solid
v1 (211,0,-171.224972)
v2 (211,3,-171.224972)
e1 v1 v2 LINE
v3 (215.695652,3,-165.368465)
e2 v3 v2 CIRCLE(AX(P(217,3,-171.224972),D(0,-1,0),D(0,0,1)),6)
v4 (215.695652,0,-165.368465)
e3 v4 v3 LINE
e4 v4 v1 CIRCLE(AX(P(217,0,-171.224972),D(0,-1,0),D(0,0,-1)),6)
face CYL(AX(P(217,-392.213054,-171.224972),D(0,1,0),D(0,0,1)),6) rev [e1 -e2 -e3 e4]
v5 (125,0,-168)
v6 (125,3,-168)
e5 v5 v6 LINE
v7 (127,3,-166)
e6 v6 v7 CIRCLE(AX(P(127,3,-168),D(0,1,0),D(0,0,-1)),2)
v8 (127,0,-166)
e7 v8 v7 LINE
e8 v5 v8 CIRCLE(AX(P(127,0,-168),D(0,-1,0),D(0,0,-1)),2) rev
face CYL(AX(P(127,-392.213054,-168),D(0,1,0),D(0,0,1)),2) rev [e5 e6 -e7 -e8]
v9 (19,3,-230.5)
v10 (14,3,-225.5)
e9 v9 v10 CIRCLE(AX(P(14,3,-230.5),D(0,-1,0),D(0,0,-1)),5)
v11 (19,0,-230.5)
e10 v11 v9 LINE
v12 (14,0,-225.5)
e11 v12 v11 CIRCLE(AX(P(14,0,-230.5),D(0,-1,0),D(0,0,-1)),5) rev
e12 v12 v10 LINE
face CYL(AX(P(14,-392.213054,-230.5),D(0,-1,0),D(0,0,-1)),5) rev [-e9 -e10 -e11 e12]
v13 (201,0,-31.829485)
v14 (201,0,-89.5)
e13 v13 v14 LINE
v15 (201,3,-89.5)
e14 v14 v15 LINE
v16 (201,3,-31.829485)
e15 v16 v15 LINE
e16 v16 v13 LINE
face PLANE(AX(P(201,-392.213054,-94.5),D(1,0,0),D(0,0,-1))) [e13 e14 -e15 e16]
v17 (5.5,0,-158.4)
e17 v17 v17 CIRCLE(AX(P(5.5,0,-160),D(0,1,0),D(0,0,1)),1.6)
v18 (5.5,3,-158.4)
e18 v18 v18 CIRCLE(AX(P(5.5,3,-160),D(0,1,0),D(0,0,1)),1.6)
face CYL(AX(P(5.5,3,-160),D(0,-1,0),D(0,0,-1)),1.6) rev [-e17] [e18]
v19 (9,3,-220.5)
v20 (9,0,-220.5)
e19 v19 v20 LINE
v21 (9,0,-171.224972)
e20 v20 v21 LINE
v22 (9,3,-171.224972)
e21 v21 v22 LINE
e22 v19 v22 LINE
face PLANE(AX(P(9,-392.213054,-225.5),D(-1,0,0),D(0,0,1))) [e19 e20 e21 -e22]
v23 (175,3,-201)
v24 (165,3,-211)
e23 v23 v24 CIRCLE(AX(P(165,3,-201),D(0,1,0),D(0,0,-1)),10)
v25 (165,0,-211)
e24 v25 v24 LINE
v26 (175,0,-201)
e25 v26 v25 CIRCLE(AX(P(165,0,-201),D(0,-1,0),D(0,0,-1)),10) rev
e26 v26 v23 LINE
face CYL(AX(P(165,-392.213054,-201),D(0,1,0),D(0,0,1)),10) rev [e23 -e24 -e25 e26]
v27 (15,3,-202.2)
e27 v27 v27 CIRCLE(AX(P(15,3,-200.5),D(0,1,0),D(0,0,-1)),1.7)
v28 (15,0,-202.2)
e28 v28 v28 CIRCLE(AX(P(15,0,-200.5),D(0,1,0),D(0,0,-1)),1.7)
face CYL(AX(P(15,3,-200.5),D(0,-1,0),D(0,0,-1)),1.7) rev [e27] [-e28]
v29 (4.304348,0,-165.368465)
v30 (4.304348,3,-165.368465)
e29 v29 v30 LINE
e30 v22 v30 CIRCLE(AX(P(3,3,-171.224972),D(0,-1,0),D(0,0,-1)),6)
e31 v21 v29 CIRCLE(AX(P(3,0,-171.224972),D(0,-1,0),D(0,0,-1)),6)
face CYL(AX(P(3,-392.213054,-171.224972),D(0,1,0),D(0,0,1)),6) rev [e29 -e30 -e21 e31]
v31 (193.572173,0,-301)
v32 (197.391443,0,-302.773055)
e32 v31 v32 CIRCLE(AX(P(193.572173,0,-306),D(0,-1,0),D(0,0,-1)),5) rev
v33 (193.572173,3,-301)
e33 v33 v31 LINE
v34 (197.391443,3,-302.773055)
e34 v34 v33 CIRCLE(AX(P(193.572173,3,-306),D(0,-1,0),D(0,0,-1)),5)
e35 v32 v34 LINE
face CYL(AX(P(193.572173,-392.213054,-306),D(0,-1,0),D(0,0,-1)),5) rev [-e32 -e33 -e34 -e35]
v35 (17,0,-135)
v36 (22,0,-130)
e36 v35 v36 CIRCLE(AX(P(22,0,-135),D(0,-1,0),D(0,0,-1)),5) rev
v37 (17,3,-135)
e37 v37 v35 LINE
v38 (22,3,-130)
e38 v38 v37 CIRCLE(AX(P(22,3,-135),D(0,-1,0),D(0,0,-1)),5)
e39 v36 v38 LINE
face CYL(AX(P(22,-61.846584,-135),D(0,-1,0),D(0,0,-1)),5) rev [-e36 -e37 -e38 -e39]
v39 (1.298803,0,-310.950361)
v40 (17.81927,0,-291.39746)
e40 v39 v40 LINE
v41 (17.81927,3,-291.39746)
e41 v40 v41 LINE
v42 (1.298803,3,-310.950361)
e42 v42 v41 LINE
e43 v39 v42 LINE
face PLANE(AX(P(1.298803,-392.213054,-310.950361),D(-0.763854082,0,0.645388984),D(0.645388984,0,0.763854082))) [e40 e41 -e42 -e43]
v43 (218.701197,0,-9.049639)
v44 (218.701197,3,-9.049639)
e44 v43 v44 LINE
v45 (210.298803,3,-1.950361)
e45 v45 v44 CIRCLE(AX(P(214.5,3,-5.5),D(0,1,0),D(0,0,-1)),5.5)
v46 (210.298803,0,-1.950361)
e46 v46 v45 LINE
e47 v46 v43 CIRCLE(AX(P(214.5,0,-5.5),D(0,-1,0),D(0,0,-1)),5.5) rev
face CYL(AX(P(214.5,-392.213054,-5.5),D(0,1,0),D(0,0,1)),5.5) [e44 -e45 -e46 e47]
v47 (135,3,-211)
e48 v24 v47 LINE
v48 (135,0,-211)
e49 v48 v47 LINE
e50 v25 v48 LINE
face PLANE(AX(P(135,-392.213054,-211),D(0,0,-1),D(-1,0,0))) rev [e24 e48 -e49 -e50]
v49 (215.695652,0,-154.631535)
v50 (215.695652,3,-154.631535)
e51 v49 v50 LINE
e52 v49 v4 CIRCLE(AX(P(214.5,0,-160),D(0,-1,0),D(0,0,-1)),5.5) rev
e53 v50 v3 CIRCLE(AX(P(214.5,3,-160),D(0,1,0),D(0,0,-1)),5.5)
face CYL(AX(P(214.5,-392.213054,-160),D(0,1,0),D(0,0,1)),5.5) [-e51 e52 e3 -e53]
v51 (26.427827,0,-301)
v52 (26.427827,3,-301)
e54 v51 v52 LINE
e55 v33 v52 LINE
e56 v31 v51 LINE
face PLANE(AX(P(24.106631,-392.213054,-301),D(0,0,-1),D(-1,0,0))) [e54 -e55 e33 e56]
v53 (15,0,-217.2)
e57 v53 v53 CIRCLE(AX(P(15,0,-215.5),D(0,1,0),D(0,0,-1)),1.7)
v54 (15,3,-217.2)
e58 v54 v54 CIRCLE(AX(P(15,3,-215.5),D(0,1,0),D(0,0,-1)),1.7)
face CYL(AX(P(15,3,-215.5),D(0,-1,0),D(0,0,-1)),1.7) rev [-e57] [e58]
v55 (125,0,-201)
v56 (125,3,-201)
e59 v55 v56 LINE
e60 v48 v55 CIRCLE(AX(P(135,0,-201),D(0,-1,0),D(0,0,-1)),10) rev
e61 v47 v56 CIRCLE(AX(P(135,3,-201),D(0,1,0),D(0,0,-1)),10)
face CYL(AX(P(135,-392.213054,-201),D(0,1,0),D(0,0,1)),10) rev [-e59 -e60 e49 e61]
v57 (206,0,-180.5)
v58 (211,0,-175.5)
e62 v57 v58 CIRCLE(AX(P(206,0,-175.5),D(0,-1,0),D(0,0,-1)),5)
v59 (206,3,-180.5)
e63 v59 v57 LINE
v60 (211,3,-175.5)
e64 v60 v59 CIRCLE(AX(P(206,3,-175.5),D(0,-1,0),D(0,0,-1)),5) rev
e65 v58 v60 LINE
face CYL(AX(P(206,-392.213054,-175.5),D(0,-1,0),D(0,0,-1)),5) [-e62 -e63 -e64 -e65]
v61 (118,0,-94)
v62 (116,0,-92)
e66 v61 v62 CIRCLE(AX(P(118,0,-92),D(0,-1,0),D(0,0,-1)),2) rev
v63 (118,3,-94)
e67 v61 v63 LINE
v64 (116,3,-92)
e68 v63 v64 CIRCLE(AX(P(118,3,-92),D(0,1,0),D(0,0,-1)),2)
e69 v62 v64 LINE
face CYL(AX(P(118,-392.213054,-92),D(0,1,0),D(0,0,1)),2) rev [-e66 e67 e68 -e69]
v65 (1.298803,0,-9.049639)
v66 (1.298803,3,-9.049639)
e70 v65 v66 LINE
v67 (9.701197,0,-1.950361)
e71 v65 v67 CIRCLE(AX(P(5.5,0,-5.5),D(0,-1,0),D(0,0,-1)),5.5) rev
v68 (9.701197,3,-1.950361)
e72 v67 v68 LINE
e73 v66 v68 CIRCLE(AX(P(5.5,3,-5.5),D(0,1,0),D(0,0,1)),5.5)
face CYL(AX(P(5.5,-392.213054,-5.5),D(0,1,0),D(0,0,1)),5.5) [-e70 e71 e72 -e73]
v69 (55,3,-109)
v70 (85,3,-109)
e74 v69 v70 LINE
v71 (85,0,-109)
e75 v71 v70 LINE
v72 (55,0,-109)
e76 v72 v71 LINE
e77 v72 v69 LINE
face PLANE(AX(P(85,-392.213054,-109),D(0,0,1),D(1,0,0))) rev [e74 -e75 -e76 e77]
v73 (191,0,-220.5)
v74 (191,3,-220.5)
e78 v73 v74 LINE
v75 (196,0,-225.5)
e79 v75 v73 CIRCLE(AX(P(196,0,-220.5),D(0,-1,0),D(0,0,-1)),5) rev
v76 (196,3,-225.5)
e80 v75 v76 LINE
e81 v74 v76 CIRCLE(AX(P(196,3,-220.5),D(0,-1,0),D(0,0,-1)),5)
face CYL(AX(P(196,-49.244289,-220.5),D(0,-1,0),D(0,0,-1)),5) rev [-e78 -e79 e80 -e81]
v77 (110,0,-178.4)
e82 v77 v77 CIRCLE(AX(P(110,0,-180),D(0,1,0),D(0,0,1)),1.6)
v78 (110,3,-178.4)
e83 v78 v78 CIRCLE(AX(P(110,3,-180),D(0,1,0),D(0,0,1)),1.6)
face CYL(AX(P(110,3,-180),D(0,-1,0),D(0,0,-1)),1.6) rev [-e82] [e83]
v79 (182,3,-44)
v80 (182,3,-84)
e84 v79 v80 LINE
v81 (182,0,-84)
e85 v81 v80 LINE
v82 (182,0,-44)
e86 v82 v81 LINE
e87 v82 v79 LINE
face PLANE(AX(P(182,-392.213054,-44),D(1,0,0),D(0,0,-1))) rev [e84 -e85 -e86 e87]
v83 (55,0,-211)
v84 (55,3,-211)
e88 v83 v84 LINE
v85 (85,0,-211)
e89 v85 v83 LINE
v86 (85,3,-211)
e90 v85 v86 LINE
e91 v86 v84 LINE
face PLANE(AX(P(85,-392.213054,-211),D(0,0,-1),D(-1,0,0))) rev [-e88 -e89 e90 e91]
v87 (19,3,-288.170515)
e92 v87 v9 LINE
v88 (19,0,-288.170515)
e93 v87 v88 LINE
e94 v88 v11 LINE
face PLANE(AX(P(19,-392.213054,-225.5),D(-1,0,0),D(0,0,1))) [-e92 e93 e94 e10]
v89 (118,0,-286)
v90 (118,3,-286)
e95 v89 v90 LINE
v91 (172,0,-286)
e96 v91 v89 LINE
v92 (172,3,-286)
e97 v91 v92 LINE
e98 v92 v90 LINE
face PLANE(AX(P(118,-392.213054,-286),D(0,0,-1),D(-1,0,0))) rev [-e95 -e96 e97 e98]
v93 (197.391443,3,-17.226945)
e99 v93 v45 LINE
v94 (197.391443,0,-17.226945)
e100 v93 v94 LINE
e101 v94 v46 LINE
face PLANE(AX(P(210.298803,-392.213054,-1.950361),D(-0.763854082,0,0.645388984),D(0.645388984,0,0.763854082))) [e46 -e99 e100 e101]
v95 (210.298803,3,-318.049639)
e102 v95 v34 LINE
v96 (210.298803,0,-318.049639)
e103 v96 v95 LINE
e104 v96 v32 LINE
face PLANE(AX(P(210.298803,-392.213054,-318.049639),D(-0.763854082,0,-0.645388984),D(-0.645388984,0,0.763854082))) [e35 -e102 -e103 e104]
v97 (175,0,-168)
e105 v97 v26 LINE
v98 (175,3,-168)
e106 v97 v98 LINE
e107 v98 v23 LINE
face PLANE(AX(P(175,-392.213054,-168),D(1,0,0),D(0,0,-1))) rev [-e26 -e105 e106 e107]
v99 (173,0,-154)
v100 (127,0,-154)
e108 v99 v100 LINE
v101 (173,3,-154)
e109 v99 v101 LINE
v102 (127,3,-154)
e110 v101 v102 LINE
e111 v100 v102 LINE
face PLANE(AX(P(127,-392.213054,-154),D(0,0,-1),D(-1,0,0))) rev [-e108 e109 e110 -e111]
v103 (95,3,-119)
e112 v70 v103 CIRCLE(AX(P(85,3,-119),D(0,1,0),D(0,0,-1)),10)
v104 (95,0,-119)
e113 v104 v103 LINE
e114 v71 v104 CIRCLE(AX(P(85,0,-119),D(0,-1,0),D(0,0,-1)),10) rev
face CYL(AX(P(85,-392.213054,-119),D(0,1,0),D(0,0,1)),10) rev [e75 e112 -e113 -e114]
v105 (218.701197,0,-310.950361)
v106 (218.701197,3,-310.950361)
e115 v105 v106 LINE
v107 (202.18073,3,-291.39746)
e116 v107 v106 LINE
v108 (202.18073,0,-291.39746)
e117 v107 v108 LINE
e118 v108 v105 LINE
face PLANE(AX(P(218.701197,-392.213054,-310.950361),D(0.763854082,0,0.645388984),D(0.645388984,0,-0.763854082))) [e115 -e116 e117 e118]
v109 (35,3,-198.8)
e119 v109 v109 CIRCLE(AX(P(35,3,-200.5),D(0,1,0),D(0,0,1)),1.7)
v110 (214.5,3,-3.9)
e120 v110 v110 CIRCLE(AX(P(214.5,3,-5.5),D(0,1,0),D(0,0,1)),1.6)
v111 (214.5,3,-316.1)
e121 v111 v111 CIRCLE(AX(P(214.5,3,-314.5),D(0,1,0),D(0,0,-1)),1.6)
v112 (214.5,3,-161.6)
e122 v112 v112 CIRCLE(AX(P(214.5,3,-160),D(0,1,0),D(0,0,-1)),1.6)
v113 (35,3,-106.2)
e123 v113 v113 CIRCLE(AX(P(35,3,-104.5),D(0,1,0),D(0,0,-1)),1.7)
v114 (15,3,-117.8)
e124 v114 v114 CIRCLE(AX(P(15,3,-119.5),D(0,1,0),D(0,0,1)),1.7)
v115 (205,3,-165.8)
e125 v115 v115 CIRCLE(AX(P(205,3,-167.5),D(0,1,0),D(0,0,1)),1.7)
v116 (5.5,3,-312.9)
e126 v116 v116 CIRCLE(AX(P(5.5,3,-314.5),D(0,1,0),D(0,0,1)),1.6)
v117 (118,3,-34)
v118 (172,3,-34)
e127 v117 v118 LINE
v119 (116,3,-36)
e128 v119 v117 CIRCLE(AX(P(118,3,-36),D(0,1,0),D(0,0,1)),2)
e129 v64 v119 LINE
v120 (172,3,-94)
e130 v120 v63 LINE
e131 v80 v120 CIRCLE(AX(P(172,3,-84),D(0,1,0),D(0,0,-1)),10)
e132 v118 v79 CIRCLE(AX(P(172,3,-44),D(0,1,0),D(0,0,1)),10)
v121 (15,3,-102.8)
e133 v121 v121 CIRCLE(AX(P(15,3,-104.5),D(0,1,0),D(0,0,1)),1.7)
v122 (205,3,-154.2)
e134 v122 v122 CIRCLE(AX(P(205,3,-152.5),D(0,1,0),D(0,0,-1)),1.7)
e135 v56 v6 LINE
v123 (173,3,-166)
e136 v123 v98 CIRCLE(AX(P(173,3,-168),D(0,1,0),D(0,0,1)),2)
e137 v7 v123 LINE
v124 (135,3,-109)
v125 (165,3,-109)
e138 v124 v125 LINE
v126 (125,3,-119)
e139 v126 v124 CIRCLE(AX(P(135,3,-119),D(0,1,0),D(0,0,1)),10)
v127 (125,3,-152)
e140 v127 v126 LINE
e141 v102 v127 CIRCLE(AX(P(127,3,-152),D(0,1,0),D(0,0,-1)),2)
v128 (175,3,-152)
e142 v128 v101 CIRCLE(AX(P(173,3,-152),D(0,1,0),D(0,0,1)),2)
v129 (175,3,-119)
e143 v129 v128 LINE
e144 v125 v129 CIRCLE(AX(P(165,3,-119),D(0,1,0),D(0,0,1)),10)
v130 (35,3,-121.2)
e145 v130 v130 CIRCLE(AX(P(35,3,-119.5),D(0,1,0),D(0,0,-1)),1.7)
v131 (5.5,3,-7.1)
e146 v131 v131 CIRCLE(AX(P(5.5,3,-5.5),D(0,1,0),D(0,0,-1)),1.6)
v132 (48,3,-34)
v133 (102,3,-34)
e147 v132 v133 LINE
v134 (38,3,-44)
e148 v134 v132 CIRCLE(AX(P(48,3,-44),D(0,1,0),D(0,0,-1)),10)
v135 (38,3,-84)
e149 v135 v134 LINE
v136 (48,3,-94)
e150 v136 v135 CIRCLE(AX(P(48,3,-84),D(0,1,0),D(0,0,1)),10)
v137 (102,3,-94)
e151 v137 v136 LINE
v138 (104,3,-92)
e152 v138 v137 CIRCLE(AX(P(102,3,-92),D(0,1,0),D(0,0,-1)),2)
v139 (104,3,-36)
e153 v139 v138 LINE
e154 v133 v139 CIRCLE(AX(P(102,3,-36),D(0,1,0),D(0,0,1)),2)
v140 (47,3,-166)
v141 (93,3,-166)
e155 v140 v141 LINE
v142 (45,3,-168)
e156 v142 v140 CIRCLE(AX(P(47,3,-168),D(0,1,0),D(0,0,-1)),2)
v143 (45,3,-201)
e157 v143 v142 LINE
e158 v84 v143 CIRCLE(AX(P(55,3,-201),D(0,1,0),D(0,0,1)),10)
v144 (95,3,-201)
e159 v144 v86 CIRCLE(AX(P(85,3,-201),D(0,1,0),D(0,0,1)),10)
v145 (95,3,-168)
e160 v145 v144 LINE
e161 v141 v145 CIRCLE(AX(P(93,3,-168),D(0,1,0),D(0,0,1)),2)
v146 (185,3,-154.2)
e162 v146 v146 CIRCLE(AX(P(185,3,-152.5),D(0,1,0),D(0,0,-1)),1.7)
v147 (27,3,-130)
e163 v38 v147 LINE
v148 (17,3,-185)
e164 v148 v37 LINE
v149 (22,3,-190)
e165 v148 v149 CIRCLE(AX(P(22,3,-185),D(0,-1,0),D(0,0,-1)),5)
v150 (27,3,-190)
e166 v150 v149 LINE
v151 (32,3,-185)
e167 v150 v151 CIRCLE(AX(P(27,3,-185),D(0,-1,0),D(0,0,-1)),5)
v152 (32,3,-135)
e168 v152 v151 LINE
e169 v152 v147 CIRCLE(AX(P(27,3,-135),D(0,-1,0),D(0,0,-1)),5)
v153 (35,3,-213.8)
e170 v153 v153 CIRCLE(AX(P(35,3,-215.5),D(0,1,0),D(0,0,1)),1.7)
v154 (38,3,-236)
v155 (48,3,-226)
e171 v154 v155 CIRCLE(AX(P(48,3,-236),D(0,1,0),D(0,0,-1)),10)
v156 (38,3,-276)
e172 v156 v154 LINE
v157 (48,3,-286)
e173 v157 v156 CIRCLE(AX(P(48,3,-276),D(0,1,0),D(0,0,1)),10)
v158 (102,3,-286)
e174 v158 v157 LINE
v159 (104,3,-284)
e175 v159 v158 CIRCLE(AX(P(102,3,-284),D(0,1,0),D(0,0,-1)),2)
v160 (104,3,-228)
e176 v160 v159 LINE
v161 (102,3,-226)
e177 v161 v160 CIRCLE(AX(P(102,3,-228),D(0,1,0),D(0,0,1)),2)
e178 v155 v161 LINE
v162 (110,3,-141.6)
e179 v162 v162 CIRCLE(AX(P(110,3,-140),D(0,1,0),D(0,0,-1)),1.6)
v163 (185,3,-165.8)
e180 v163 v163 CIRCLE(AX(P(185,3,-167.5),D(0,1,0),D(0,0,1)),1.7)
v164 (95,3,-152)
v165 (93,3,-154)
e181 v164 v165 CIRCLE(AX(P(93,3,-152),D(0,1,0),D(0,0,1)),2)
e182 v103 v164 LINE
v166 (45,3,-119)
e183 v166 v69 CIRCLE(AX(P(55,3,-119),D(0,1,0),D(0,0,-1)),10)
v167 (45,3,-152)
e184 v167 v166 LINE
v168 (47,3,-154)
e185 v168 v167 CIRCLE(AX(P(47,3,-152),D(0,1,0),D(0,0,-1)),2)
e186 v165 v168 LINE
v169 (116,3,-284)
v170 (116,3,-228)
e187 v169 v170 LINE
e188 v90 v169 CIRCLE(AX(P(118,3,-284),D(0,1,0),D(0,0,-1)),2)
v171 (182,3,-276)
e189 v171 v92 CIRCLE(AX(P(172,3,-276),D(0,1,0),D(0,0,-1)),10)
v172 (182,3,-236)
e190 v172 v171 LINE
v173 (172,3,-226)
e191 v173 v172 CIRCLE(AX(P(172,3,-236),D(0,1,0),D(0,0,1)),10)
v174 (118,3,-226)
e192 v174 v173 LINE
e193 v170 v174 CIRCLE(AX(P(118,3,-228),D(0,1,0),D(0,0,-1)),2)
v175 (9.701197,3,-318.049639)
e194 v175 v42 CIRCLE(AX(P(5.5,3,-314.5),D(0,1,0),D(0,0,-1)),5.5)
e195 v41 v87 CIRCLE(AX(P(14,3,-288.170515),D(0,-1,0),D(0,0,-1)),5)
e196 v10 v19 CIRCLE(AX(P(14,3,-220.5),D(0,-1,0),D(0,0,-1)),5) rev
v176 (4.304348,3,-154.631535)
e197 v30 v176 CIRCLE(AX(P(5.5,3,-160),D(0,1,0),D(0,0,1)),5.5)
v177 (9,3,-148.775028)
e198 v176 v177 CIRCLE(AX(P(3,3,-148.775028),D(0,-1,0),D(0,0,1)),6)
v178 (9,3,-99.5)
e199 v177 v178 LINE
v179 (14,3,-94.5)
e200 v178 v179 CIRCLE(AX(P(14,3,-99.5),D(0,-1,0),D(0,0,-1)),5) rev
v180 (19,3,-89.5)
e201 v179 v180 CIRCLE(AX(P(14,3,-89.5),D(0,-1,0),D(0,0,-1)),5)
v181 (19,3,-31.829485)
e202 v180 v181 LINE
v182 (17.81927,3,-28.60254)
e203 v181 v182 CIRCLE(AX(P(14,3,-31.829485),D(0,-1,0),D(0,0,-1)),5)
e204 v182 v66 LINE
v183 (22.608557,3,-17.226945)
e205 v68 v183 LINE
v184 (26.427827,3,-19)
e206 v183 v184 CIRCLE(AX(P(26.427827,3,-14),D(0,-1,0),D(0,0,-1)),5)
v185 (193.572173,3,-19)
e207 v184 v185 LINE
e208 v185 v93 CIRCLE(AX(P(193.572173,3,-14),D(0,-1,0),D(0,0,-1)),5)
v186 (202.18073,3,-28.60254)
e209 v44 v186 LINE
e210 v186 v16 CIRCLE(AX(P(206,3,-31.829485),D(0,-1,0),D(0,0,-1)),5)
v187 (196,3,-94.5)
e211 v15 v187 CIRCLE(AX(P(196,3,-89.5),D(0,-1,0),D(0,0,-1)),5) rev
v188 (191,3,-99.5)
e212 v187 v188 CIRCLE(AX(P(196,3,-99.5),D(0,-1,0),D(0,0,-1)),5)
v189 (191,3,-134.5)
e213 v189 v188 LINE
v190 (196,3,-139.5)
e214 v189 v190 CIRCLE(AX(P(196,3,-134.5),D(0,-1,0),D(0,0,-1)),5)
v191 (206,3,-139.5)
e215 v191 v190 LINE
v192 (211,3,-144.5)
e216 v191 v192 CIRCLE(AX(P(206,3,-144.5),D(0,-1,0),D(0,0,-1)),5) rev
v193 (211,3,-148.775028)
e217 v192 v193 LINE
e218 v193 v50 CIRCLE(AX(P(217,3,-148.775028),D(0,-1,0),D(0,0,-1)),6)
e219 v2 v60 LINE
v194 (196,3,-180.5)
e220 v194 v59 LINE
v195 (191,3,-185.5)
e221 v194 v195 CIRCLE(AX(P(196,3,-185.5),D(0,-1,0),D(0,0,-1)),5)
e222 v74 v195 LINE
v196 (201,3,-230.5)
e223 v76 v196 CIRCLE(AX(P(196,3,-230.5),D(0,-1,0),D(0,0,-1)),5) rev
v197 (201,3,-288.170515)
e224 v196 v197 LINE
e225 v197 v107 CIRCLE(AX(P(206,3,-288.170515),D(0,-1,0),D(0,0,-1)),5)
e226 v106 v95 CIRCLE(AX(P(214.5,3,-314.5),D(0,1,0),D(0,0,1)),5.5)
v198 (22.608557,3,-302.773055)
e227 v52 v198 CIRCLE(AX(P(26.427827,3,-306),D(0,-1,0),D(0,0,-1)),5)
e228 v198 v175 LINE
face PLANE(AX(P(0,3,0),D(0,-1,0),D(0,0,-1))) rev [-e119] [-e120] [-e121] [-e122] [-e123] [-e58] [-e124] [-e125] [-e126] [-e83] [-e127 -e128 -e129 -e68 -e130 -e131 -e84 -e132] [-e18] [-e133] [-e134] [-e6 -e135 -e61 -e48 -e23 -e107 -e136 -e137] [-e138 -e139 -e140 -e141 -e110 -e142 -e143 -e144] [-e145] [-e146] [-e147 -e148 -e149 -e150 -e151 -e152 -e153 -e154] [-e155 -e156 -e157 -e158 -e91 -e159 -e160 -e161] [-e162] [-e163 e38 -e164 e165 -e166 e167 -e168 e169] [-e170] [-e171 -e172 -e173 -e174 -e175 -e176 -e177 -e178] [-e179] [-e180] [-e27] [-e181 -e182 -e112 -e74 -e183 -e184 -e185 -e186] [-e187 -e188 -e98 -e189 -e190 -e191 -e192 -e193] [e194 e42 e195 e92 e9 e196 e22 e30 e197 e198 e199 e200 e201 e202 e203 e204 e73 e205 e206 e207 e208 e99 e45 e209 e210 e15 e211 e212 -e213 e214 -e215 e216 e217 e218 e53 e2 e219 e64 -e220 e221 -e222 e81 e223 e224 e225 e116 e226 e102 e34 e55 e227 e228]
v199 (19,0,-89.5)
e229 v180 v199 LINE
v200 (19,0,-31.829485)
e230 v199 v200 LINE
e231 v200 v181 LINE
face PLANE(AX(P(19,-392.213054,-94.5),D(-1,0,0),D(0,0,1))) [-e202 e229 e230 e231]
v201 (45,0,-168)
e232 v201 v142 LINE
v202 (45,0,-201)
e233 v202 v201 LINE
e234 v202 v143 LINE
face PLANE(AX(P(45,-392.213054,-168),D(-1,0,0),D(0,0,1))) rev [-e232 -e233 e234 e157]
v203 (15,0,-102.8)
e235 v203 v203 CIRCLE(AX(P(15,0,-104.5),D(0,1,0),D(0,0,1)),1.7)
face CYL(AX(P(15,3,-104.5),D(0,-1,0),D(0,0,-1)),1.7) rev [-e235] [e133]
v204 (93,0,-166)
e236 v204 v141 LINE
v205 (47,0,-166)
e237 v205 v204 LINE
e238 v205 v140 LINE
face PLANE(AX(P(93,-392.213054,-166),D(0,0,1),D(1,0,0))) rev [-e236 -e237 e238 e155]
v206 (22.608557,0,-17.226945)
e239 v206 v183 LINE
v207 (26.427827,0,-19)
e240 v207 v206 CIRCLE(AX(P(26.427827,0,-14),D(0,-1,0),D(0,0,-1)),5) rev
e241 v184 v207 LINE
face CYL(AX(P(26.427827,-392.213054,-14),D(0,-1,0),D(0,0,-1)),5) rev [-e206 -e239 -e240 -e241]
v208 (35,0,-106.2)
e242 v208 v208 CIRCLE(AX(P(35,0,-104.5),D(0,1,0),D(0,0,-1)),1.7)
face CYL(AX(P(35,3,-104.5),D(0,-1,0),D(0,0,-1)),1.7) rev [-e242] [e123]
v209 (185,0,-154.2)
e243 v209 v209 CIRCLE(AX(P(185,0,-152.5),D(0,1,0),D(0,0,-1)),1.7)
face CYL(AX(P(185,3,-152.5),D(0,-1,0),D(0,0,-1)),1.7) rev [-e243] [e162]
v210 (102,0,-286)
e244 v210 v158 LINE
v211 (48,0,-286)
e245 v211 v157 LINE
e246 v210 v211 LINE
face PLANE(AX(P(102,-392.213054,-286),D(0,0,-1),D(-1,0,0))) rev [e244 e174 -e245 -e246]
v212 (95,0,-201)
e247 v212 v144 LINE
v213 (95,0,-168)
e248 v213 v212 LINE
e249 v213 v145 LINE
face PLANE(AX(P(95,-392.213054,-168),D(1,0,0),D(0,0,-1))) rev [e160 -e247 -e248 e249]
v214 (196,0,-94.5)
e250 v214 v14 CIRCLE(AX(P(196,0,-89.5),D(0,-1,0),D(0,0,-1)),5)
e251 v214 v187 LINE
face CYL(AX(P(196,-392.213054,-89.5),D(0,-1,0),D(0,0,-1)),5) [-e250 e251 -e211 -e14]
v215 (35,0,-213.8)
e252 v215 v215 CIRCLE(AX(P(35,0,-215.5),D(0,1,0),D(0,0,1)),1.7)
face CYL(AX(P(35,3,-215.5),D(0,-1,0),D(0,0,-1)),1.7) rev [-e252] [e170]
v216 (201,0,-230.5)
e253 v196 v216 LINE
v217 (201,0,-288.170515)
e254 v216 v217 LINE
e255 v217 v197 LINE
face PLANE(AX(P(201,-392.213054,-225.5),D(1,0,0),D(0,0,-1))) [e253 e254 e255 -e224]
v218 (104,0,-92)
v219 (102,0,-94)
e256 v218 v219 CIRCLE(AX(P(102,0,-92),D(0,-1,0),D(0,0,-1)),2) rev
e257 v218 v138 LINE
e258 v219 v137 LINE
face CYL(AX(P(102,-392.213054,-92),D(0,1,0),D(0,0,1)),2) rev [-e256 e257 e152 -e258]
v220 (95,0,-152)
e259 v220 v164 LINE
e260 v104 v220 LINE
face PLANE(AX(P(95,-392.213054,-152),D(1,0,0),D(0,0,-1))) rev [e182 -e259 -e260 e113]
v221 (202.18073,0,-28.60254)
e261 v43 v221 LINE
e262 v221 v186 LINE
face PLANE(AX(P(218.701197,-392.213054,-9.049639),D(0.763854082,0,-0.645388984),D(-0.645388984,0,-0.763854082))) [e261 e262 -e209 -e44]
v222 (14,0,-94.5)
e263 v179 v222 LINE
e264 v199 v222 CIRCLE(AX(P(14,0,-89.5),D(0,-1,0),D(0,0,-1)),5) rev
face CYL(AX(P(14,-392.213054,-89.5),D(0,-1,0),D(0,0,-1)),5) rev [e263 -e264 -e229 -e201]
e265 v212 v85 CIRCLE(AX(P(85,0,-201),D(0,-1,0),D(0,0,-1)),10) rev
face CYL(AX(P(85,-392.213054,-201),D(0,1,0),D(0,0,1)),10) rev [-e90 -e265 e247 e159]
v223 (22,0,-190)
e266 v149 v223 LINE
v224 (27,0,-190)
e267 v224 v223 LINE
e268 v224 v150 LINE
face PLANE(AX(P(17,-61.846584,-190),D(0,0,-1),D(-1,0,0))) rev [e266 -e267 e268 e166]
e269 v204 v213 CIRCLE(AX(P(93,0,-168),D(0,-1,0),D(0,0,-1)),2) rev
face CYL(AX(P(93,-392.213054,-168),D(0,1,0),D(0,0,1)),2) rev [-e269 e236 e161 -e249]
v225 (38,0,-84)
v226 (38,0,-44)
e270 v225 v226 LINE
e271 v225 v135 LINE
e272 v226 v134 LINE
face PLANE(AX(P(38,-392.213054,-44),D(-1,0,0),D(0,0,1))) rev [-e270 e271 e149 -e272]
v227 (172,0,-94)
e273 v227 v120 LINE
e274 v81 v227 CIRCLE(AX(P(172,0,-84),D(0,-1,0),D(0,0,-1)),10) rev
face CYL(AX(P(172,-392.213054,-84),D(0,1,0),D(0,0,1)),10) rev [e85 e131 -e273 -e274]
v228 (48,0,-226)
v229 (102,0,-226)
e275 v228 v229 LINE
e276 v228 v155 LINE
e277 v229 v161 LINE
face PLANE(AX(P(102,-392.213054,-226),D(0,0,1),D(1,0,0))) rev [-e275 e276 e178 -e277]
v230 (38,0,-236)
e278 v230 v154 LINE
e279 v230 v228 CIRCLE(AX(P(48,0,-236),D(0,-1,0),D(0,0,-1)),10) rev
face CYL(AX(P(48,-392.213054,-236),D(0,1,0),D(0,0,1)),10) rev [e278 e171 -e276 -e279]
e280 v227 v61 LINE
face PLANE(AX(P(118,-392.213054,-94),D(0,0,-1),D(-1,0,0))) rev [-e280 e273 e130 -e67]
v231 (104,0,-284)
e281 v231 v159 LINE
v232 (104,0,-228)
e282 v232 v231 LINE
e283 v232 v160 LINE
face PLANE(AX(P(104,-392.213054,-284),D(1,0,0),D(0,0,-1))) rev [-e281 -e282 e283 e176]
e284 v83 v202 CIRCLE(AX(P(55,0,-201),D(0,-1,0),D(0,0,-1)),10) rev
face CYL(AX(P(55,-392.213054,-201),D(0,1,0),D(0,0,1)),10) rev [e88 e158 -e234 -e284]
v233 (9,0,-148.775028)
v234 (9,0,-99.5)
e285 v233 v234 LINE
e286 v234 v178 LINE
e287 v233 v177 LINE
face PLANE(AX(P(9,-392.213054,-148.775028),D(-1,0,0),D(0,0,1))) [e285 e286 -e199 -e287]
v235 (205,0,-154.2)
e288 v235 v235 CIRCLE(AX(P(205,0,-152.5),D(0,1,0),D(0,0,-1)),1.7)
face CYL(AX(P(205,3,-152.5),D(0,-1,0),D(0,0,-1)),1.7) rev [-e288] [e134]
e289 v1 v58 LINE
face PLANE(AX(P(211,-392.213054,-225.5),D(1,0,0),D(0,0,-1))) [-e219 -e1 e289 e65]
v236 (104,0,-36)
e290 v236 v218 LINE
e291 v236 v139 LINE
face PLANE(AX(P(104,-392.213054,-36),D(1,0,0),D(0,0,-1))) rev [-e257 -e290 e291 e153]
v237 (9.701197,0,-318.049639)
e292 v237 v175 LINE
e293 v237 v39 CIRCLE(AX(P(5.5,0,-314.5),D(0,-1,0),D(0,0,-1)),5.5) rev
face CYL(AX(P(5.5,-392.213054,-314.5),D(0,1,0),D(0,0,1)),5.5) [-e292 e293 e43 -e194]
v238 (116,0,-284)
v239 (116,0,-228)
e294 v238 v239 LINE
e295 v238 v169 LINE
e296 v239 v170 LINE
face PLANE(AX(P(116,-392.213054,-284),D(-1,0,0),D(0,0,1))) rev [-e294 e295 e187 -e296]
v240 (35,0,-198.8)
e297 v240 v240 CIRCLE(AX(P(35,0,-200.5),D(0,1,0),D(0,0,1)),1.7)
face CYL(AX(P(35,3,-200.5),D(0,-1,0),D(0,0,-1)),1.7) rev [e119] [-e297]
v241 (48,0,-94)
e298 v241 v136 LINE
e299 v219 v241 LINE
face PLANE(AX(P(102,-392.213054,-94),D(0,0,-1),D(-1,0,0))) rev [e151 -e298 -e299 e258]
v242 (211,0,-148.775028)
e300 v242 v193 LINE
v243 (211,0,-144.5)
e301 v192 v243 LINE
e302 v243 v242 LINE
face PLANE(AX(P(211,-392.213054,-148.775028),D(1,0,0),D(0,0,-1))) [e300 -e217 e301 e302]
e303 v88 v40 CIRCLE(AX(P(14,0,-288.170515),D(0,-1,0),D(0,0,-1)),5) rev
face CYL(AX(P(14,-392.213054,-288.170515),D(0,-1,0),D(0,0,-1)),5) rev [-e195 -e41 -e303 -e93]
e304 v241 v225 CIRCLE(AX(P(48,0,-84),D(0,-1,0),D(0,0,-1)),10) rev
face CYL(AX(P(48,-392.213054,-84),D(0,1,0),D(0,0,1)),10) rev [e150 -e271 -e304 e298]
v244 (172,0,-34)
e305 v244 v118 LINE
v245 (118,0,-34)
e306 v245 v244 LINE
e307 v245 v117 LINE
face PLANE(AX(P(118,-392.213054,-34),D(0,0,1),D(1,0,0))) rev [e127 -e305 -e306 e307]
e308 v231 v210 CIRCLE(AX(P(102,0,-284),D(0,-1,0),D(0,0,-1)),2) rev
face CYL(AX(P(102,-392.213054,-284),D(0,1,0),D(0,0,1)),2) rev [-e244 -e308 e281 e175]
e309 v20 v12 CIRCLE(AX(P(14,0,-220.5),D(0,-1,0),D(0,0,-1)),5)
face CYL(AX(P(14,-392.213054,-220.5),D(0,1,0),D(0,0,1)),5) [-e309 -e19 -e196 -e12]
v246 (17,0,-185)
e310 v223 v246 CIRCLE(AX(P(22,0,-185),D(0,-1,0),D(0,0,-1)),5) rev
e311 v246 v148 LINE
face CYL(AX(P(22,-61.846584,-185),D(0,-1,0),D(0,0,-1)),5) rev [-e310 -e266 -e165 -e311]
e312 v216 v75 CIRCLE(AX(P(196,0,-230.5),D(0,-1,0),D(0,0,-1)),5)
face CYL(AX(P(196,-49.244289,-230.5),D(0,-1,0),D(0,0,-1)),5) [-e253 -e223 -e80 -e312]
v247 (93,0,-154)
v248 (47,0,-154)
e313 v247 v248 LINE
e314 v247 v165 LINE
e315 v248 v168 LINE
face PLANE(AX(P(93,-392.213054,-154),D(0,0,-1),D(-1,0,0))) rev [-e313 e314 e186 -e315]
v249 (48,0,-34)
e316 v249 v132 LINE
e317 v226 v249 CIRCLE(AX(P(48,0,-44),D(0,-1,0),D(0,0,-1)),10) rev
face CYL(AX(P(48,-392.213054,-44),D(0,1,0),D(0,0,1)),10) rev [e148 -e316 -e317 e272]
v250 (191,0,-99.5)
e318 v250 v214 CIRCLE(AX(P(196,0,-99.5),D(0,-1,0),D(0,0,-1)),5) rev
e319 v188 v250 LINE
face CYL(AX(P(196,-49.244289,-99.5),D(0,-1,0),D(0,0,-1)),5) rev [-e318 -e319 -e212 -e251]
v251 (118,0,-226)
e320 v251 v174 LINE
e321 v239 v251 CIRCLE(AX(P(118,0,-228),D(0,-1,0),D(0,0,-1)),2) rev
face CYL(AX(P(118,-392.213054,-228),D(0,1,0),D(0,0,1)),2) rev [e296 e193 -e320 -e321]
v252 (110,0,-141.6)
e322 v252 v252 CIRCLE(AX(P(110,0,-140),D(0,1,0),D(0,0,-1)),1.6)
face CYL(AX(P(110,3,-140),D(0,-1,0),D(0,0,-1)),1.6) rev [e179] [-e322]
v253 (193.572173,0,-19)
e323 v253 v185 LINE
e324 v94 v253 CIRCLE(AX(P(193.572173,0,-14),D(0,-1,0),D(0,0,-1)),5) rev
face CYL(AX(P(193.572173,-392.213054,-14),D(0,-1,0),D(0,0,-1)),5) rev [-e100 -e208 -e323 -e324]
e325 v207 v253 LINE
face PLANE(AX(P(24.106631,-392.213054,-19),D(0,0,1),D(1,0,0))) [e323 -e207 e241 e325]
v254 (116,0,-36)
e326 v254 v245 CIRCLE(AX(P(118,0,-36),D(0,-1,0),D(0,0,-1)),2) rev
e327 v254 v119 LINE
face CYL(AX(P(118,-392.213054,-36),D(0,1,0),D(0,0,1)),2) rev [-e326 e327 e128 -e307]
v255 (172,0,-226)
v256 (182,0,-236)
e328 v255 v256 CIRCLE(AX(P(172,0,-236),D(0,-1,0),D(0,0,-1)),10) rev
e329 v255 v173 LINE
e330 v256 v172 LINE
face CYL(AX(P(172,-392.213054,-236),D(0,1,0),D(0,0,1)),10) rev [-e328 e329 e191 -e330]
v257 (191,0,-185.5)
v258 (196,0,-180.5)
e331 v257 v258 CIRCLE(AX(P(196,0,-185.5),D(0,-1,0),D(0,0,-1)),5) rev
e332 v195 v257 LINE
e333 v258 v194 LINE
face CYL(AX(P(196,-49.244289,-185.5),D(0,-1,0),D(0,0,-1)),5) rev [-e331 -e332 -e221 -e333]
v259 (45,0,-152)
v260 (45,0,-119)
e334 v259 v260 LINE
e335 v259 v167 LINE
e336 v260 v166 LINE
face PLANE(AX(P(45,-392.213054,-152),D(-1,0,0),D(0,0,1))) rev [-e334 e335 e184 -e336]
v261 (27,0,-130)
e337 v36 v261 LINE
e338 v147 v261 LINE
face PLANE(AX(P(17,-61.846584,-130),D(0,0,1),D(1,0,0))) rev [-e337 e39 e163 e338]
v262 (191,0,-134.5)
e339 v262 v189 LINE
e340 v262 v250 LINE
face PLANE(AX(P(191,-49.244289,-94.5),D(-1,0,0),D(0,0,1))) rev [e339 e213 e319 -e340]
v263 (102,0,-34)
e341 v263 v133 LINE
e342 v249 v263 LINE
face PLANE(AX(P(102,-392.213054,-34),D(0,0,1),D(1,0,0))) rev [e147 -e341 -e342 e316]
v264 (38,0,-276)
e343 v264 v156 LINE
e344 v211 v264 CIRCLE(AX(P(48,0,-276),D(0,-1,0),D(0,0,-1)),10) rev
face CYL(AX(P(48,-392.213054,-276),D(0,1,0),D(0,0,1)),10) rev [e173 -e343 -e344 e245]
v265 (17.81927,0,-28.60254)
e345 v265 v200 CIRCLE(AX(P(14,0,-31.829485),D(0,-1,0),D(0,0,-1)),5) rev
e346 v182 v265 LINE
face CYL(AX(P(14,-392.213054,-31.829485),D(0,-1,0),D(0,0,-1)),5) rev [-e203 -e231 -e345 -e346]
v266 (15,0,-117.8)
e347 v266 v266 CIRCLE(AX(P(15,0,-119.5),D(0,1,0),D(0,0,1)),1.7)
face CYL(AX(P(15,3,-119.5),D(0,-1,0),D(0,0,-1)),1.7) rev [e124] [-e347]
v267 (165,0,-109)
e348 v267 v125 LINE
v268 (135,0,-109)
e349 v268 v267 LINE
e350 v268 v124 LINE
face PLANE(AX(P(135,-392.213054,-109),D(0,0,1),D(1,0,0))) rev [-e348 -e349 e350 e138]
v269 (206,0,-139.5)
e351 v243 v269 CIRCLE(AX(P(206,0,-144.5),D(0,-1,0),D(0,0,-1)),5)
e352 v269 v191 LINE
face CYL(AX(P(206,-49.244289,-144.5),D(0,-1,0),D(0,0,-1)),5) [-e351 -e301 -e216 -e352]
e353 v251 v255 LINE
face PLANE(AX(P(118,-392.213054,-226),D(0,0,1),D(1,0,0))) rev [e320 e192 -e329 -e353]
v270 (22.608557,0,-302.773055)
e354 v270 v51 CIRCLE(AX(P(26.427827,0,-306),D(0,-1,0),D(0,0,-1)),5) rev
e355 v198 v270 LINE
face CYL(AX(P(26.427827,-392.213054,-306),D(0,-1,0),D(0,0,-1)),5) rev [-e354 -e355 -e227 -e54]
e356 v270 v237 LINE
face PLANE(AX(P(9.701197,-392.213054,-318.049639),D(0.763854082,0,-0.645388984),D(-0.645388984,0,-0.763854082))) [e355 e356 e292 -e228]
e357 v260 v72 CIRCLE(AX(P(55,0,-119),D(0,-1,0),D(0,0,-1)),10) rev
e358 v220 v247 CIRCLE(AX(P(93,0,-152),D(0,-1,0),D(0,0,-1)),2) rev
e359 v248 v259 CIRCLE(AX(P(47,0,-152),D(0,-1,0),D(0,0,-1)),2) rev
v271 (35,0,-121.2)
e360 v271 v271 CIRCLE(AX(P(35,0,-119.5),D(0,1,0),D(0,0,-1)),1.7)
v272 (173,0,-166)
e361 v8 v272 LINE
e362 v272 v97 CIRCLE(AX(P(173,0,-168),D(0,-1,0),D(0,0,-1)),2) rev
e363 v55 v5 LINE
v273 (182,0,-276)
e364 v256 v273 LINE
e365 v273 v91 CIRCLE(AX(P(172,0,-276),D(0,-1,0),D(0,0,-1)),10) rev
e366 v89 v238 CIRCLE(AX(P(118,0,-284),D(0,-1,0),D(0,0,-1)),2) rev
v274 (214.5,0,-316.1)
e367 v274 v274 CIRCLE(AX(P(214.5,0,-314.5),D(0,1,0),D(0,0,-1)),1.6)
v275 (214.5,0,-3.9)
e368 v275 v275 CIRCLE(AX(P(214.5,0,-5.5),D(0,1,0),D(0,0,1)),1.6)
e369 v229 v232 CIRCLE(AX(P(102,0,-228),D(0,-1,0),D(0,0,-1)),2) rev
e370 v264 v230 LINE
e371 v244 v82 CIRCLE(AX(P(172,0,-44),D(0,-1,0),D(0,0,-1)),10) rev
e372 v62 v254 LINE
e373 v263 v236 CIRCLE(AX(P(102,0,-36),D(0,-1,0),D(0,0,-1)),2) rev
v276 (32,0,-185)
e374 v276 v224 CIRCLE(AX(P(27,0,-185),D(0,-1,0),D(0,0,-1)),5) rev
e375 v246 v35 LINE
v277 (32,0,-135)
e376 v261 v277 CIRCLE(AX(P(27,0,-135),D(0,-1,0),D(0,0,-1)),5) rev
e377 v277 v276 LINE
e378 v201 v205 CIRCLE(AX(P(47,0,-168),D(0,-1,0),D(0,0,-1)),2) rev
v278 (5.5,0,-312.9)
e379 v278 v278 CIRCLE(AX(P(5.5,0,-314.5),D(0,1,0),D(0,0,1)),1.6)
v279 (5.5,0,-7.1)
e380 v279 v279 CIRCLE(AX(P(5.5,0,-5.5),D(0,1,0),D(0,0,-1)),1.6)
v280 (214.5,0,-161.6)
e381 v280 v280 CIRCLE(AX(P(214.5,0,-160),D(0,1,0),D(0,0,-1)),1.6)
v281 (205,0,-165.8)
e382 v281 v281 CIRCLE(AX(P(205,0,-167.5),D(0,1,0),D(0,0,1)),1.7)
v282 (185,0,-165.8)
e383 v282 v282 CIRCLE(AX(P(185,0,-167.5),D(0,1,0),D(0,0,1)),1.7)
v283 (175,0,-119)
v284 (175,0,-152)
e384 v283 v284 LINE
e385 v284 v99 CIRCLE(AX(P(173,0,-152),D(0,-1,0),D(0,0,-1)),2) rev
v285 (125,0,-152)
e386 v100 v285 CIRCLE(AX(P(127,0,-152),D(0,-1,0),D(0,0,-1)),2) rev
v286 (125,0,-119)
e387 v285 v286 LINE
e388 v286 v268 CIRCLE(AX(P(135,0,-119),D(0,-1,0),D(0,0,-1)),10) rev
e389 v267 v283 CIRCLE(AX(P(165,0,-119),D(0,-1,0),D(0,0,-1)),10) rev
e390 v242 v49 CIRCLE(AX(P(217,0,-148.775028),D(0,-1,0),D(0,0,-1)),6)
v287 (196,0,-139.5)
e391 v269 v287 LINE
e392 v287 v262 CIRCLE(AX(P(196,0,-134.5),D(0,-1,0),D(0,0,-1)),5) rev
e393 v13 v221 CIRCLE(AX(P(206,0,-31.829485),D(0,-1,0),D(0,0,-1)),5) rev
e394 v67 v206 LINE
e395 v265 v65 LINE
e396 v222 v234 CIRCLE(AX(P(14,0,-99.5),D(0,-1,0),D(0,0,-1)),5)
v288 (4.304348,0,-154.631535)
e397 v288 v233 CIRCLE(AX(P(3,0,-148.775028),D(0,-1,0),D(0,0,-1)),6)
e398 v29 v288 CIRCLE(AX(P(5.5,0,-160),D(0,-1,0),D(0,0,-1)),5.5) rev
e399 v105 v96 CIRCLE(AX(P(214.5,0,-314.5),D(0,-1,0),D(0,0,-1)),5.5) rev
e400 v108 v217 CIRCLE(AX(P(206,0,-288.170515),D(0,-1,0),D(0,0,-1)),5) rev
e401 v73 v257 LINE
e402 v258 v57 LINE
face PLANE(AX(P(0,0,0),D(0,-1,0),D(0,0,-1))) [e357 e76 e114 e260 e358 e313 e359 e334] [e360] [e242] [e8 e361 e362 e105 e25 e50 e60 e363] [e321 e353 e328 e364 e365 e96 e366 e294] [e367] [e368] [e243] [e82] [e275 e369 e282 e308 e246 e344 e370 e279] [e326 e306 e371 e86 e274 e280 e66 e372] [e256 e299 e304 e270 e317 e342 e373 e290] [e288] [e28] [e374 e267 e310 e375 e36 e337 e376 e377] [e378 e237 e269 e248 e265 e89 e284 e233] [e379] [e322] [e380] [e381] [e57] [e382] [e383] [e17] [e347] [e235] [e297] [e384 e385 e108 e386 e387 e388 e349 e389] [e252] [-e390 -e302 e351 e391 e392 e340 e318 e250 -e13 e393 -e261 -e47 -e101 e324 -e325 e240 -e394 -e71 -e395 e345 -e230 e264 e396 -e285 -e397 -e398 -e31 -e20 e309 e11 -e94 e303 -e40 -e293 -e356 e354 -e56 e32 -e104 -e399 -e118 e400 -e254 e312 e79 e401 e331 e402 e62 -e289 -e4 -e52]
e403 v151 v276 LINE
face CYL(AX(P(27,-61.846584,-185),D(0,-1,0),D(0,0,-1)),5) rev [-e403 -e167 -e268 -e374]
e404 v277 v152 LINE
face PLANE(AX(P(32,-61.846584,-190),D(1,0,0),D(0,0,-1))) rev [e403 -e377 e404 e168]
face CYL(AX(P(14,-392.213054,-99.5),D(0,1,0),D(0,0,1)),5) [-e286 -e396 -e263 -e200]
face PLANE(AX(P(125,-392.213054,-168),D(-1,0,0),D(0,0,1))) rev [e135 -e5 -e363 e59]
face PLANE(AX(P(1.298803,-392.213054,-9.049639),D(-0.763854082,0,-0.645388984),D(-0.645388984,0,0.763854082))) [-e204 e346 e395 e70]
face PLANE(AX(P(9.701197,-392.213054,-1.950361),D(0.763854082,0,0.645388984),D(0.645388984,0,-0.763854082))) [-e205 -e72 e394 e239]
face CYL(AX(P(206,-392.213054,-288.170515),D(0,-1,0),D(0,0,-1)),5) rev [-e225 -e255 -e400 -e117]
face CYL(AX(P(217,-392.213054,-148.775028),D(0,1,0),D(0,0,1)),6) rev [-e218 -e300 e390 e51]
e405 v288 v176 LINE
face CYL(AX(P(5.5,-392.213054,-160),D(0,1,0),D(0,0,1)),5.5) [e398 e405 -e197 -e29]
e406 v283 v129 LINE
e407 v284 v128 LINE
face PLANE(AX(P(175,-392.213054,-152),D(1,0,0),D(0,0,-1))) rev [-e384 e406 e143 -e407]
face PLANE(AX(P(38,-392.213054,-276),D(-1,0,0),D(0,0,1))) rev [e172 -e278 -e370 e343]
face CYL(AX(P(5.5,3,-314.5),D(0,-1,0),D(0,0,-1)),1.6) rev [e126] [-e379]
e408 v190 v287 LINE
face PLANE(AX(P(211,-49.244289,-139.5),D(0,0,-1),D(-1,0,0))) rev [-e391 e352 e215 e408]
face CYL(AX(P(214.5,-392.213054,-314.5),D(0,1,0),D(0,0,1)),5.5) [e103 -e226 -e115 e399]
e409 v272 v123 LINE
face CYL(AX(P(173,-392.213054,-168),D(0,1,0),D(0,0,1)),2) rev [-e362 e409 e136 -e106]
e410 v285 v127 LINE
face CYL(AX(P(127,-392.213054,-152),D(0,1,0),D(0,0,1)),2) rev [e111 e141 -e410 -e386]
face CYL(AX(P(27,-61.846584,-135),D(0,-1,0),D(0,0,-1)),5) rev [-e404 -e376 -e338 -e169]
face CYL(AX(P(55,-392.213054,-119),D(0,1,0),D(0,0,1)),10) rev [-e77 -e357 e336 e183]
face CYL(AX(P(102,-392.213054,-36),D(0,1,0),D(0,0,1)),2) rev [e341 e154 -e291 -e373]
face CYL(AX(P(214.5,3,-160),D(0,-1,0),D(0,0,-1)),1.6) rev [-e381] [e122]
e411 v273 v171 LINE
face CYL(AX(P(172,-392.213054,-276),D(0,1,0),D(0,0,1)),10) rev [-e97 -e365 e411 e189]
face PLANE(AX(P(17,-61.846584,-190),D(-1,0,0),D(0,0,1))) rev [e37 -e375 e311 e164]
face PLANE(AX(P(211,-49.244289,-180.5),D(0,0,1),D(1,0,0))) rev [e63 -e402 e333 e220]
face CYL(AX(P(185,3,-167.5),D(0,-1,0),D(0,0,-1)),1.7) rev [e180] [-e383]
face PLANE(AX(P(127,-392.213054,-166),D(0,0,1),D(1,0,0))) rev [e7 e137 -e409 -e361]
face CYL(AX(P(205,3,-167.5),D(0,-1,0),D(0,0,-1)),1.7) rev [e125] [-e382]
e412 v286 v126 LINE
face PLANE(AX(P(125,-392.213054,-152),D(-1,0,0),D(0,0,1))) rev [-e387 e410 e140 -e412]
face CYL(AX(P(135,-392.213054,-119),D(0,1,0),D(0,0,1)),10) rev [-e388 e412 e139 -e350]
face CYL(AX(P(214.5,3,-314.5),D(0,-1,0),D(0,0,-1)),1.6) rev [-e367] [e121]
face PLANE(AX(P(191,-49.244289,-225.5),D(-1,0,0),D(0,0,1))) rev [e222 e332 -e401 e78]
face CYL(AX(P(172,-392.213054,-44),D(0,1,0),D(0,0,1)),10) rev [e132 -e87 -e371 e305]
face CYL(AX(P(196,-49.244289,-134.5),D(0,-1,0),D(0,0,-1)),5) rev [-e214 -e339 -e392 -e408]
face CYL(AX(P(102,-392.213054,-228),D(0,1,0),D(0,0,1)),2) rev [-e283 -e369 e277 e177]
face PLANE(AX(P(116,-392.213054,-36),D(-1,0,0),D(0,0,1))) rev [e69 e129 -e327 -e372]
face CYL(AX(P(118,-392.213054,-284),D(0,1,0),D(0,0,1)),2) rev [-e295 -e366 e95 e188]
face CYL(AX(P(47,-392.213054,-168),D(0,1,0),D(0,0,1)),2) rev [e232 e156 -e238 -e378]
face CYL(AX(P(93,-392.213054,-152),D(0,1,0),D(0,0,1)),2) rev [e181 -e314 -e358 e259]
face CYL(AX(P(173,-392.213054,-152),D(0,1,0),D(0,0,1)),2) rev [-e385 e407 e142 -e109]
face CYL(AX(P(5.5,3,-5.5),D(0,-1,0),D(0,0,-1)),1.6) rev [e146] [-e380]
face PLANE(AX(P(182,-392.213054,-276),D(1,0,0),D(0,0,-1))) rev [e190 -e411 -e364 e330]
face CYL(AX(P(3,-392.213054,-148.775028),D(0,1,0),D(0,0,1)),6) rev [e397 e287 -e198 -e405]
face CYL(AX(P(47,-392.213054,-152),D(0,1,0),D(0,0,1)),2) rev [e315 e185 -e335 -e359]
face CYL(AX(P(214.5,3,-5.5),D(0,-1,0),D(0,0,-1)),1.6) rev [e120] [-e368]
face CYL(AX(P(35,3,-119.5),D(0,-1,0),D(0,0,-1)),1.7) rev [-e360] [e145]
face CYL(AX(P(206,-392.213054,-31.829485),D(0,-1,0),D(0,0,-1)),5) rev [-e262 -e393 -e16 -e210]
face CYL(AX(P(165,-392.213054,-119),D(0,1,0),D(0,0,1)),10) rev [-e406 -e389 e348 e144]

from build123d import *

# Parameters (mm, degrees)
CROQUIS1_W              = 220
CROQUIS1_H              = 320
CROQUIS1_R              = 1.7
CROQUIS1_R_2            = 1.6
SALIENTE_EXTRUIR1_DEPTH = 3
CROQUIS2_OUTSIDE_W      = 299.668
CROQUIS2_OUTSIDE_H      = 399.668
CORTAR_EXTRUIR1_DEPTH   = 3
REDONDEO1_R             = 5
CROQUIS3_W              = 20
CROQUIS3_H              = 45
CORTAR_EXTRUIR2_DEPTH   = 3
CROQUIS4_W              = 15
CROQUIS4_H              = 60
CORTAR_EXTRUIR3_DEPTH   = 3
REDONDEO2_R             = 5


with BuildPart() as part:
    # Croquis1 → Saliente-Extruir1 (new body)
    with BuildSketch(Plane(origin=(0, 0, 0), x_dir=(1, 0, 0), z_dir=(0, 1, 0))):
        with Locations((110, 160)):
            Rectangle(CROQUIS1_W, CROQUIS1_H)
        with Locations(Location((185, 167.5, 0), (0, 0, 270))):
            Circle(CROQUIS1_R, mode=Mode.SUBTRACT)
        with Locations(Location((205, 167.5, 0), (0, 0, 270))):
            Circle(CROQUIS1_R, mode=Mode.SUBTRACT)
        with Locations(Location((185, 152.5, 0), (0, 0, 90))):
            Circle(CROQUIS1_R, mode=Mode.SUBTRACT)
        with Locations(Location((205, 152.5, 0), (0, 0, 90))):
            Circle(CROQUIS1_R, mode=Mode.SUBTRACT)
        with Locations(Location((35, 215.5, 0), (0, 0, 270))):
            Circle(CROQUIS1_R, mode=Mode.SUBTRACT)
        with Locations(Location((35, 200.5, 0), (0, 0, 270))):
            Circle(CROQUIS1_R, mode=Mode.SUBTRACT)
        with Locations(Location((35, 119.5, 0), (0, 0, 90))):
            Circle(CROQUIS1_R, mode=Mode.SUBTRACT)
        with Locations(Location((35, 104.5, 0), (0, 0, 90))):
            Circle(CROQUIS1_R, mode=Mode.SUBTRACT)
        with Locations(Location((5.5, 314.5, 0), (0, 0, 270))):
            Circle(CROQUIS1_R_2, mode=Mode.SUBTRACT)
        with Locations(Location((214.5, 314.5, 0), (0, 0, 90))):
            Circle(CROQUIS1_R_2, mode=Mode.SUBTRACT)
        with Locations(Location((214.5, 5.5, 0), (0, 0, 270))):
            Circle(CROQUIS1_R_2, mode=Mode.SUBTRACT)
        with Locations(Location((5.5, 5.5, 0), (0, 0, 90))):
            Circle(CROQUIS1_R_2, mode=Mode.SUBTRACT)
        with Locations(Location((15, 200.5, 0), (0, 0, 90))):
            Circle(CROQUIS1_R, mode=Mode.SUBTRACT)
        with Locations(Location((15, 215.5, 0), (0, 0, 90))):
            Circle(CROQUIS1_R, mode=Mode.SUBTRACT)
        with Locations(Location((15, 104.5, 0), (0, 0, 270))):
            Circle(CROQUIS1_R, mode=Mode.SUBTRACT)
        with Locations(Location((15, 119.5, 0), (0, 0, 270))):
            Circle(CROQUIS1_R, mode=Mode.SUBTRACT)
        with Locations(Location((110, 180, 0), (0, 0, 270))):
            Circle(CROQUIS1_R_2, mode=Mode.SUBTRACT)
        with Locations(Location((110, 140, 0), (0, 0, 90))):
            Circle(CROQUIS1_R_2, mode=Mode.SUBTRACT)
        with Locations(Location((5.5, 160, 0), (0, 0, 270))):
            Circle(CROQUIS1_R_2, mode=Mode.SUBTRACT)
        with Locations(Location((214.5, 160, 0), (0, 0, 90))):
            Circle(CROQUIS1_R_2, mode=Mode.SUBTRACT)
    extrude(amount=SALIENTE_EXTRUIR1_DEPTH)

    # Croquis2 outside → Cortar-Extruir1 (cut)
    # profile 1 of 9: a face of its own
    with BuildSketch(Plane(origin=(0, 3, 0), x_dir=(1, 0, 0), z_dir=(0, 1, 0))):
        with Locations((110, 160)):
            Rectangle(CROQUIS2_OUTSIDE_W, CROQUIS2_OUTSIDE_H)
        with BuildLine():
            Line((9, 148.77502784), (9, 94.5))
            Line((9, 94.5), (19, 94.5))
            Line((19, 94.5), (19, 30))
            Line((19, 30), (1.298802547, 9.049639413))
            ThreePointArc((1.298802547, 9.049639413), (1.950360587, 1.298802547), (9.701197453, 1.950360587))
            Line((9.701197453, 1.950360587), (24.106631311, 19))
            Line((24.106631311, 19), (195.893368689, 19))
            Line((195.893368689, 19), (210.298802547, 1.950360587))
            ThreePointArc((210.298802547, 1.950360587), (218.049639413, 1.298802547), (218.701197453, 9.049639413))
            Line((218.701197453, 9.049639413), (201, 30))
            Line((201, 30), (201, 94.5))
            Line((201, 94.5), (211, 94.5))
            Line((211, 94.5), (211, 148.77502784))
            ThreePointArc((211, 148.77502784), (212.318863014, 152.528287293), (215.695652174, 154.631535054))
            ThreePointArc((215.695652174, 154.631535054), (220, 160), (215.695652174, 165.368464946))
            ThreePointArc((215.695652174, 165.368464946), (212.318863014, 167.471712707), (211, 171.22497216))
            Line((211, 171.22497216), (211, 225.5))
            Line((211, 225.5), (201, 225.5))
            Line((201, 225.5), (201, 290))
            Line((201, 290), (218.701197453, 310.950360587))
            ThreePointArc((218.701197453, 310.950360587), (218.049639413, 318.701197453), (210.298802547, 318.049639413))
            Line((210.298802547, 318.049639413), (195.893368689, 301))
            Line((195.893368689, 301), (24.106631311, 301))
            Line((24.106631311, 301), (9.701197453, 318.049639413))
            ThreePointArc((9.701197453, 318.049639413), (1.950360587, 318.701197453), (1.298802547, 310.950360587))
            Line((1.298802547, 310.950360587), (19, 290))
            Line((19, 290), (19, 225.5))
            Line((19, 225.5), (9, 225.5))
            Line((9, 225.5), (9, 171.22497216))
            ThreePointArc((9, 171.22497216), (7.681136986, 167.471712707), (4.304347826, 165.368464946))
            ThreePointArc((4.304347826, 165.368464946), (0, 160), (4.304347826, 154.631535054))
            ThreePointArc((4.304347826, 154.631535054), (7.681136986, 152.528287293), (9, 148.77502784))
        make_face(mode=Mode.SUBTRACT)
    # profile 2 of 9: a face of its own
    with BuildSketch(Plane(origin=(0, 3, 0), x_dir=(1, 0, 0), z_dir=(0, 1, 0))):
        with BuildLine():
            Line((182, 276), (182, 236))
            ThreePointArc((182, 236), (179.071067812, 228.928932188), (172, 226))
            Line((172, 226), (118, 226))
            ThreePointArc((118, 226), (116.585786438, 226.585786438), (116, 228))
            Line((116, 228), (116, 284))
            ThreePointArc((116, 284), (116.585786438, 285.414213562), (118, 286))
            Line((118, 286), (172, 286))
            ThreePointArc((172, 286), (179.071067812, 283.071067812), (182, 276))
        make_face()
    # profile 3 of 9: a face of its own
    with BuildSketch(Plane(origin=(0, 3, 0), x_dir=(1, 0, 0), z_dir=(0, 1, 0))):
        with BuildLine():
            Line((102, 286), (48, 286))
            ThreePointArc((48, 286), (40.928932188, 283.071067812), (38, 276))
            Line((38, 276), (38, 236))
            ThreePointArc((38, 236), (40.928932188, 228.928932188), (48, 226))
            Line((48, 226), (102, 226))
            ThreePointArc((102, 226), (103.414213562, 226.585786438), (104, 228))
            Line((104, 228), (104, 284))
            ThreePointArc((104, 284), (103.414213562, 285.414213562), (102, 286))
        make_face()
    # profile 4 of 9: a face of its own
    with BuildSketch(Plane(origin=(0, 3, 0), x_dir=(1, 0, 0), z_dir=(0, 1, 0))):
        with BuildLine():
            Line((102, 94), (48, 94))
            ThreePointArc((48, 94), (40.928932188, 91.071067812), (38, 84))
            Line((38, 84), (38, 44))
            ThreePointArc((38, 44), (40.928932188, 36.928932188), (48, 34))
            Line((48, 34), (102, 34))
            ThreePointArc((102, 34), (103.414213562, 34.585786438), (104, 36))
            Line((104, 36), (104, 92))
            ThreePointArc((104, 92), (103.414213562, 93.414213562), (102, 94))
        make_face()
    # profile 5 of 9: a face of its own
    with BuildSketch(Plane(origin=(0, 3, 0), x_dir=(1, 0, 0), z_dir=(0, 1, 0))):
        with BuildLine():
            Line((116, 36), (116, 92))
            ThreePointArc((116, 92), (116.585786438, 93.414213562), (118, 94))
            Line((118, 94), (172, 94))
            ThreePointArc((172, 94), (179.071067812, 91.071067812), (182, 84))
            Line((182, 84), (182, 44))
            ThreePointArc((182, 44), (179.071067812, 36.928932188), (172, 34))
            Line((172, 34), (118, 34))
            ThreePointArc((118, 34), (116.585786438, 34.585786438), (116, 36))
        make_face()
    # profile 6 of 9: a face of its own
    with BuildSketch(Plane(origin=(0, 3, 0), x_dir=(1, 0, 0), z_dir=(0, 1, 0))):
        with BuildLine():
            Line((45, 152), (45, 119))
            ThreePointArc((45, 119), (47.928932188, 111.928932188), (55, 109))
            Line((55, 109), (85, 109))
            ThreePointArc((85, 109), (92.071067812, 111.928932188), (95, 119))
            Line((95, 119), (95, 152))
            ThreePointArc((95, 152), (94.414213562, 153.414213562), (93, 154))
            Line((93, 154), (47, 154))
            ThreePointArc((47, 154), (45.585786438, 153.414213562), (45, 152))
        make_face()
    # profile 7 of 9: a face of its own
    with BuildSketch(Plane(origin=(0, 3, 0), x_dir=(1, 0, 0), z_dir=(0, 1, 0))):
        with BuildLine():
            Line((93, 166), (47, 166))
            ThreePointArc((47, 166), (45.585786438, 166.585786438), (45, 168))
            Line((45, 168), (45, 201))
            ThreePointArc((45, 201), (47.928932188, 208.071067812), (55, 211))
            Line((55, 211), (85, 211))
            ThreePointArc((85, 211), (92.071067812, 208.071067812), (95, 201))
            Line((95, 201), (95, 168))
            ThreePointArc((95, 168), (94.414213562, 166.585786438), (93, 166))
        make_face()
    # profile 8 of 9: a face of its own
    with BuildSketch(Plane(origin=(0, 3, 0), x_dir=(1, 0, 0), z_dir=(0, 1, 0))):
        with BuildLine():
            Line((135, 109), (165, 109))
            ThreePointArc((165, 109), (172.071067812, 111.928932188), (175, 119))
            Line((175, 119), (175, 152))
            ThreePointArc((175, 152), (174.414213562, 153.414213562), (173, 154))
            Line((173, 154), (127, 154))
            ThreePointArc((127, 154), (125.585786438, 153.414213562), (125, 152))
            Line((125, 152), (125, 119))
            ThreePointArc((125, 119), (127.928932188, 111.928932188), (135, 109))
        make_face()
    # profile 9 of 9: a face of its own
    with BuildSketch(Plane(origin=(0, 3, 0), x_dir=(1, 0, 0), z_dir=(0, 1, 0))):
        with BuildLine():
            Line((127, 166), (173, 166))
            ThreePointArc((173, 166), (174.414213562, 166.585786438), (175, 168))
            Line((175, 168), (175, 201))
            ThreePointArc((175, 201), (172.071067812, 208.071067812), (165, 211))
            Line((165, 211), (135, 211))
            ThreePointArc((135, 211), (127.928932188, 208.071067812), (125, 201))
            Line((125, 201), (125, 168))
            ThreePointArc((125, 168), (125.585786438, 166.585786438), (127, 166))
        make_face()
    extrude(amount=-CORTAR_EXTRUIR1_DEPTH, mode=Mode.SUBTRACT)

    # Redondeo1
    redondeo1_edges = [part.edges().sort_by_distance(p)[0] for p in [
        (9, 1.5, -225.5),
        (9, 1.5, -94.5),
        (24.106631311, 1.5, -301),
        (195.893368689, 1.5, -301),
        (201, 1.5, -290),
        (201, 1.5, -30),
        (195.893368689, 1.5, -19),
        (24.106631311, 1.5, -19),
        (19, 1.5, -30),
        (19, 1.5, -94.5),
        (19, 1.5, -290),
        (19, 1.5, -225.5),
    ]]
    fillet(redondeo1_edges, radius=REDONDEO1_R - 0.0001)  # a hair under: the kernel refuses the full size

    # Croquis3 → Cortar-Extruir2 (cut)
    with BuildSketch(Plane(origin=(0, 3, 0), x_dir=(1, 0, 0), z_dir=(0, 1, 0))):
        with Locations((201, 203)):
            Rectangle(CROQUIS3_W, CROQUIS3_H)
        with Locations((201, 117)):
            Rectangle(CROQUIS3_W, CROQUIS3_H)
    extrude(amount=-CORTAR_EXTRUIR2_DEPTH, mode=Mode.SUBTRACT)

    # Croquis4 → Cortar-Extruir3 (cut)
    with BuildSketch(Plane(origin=(0, 3, 0), x_dir=(1, 0, 0), z_dir=(0, 1, 0))):
        with Locations((24.5, 160)):
            Rectangle(CROQUIS4_W, CROQUIS4_H)
    extrude(amount=-CORTAR_EXTRUIR3_DEPTH, mode=Mode.SUBTRACT)

    # Redondeo2
    redondeo2_edges = [part.edges().sort_by_distance(p)[0] for p in [
        (201, 1.5, -94.5),
        (191, 1.5, -94.5),
        (191, 1.5, -139.5),
        (211, 1.5, -139.5),
        (211, 1.5, -180.5),
        (191, 1.5, -180.5),
        (191, 1.5, -225.5),
        (201, 1.5, -225.5),
        (32, 1.5, -190),
        (17, 1.5, -190),
        (17, 1.5, -130),
        (32, 1.5, -130),
    ]]
    fillet(redondeo2_edges, radius=REDONDEO2_R - 0.0001)  # a hair under: the kernel refuses the full size


solid = part.part
